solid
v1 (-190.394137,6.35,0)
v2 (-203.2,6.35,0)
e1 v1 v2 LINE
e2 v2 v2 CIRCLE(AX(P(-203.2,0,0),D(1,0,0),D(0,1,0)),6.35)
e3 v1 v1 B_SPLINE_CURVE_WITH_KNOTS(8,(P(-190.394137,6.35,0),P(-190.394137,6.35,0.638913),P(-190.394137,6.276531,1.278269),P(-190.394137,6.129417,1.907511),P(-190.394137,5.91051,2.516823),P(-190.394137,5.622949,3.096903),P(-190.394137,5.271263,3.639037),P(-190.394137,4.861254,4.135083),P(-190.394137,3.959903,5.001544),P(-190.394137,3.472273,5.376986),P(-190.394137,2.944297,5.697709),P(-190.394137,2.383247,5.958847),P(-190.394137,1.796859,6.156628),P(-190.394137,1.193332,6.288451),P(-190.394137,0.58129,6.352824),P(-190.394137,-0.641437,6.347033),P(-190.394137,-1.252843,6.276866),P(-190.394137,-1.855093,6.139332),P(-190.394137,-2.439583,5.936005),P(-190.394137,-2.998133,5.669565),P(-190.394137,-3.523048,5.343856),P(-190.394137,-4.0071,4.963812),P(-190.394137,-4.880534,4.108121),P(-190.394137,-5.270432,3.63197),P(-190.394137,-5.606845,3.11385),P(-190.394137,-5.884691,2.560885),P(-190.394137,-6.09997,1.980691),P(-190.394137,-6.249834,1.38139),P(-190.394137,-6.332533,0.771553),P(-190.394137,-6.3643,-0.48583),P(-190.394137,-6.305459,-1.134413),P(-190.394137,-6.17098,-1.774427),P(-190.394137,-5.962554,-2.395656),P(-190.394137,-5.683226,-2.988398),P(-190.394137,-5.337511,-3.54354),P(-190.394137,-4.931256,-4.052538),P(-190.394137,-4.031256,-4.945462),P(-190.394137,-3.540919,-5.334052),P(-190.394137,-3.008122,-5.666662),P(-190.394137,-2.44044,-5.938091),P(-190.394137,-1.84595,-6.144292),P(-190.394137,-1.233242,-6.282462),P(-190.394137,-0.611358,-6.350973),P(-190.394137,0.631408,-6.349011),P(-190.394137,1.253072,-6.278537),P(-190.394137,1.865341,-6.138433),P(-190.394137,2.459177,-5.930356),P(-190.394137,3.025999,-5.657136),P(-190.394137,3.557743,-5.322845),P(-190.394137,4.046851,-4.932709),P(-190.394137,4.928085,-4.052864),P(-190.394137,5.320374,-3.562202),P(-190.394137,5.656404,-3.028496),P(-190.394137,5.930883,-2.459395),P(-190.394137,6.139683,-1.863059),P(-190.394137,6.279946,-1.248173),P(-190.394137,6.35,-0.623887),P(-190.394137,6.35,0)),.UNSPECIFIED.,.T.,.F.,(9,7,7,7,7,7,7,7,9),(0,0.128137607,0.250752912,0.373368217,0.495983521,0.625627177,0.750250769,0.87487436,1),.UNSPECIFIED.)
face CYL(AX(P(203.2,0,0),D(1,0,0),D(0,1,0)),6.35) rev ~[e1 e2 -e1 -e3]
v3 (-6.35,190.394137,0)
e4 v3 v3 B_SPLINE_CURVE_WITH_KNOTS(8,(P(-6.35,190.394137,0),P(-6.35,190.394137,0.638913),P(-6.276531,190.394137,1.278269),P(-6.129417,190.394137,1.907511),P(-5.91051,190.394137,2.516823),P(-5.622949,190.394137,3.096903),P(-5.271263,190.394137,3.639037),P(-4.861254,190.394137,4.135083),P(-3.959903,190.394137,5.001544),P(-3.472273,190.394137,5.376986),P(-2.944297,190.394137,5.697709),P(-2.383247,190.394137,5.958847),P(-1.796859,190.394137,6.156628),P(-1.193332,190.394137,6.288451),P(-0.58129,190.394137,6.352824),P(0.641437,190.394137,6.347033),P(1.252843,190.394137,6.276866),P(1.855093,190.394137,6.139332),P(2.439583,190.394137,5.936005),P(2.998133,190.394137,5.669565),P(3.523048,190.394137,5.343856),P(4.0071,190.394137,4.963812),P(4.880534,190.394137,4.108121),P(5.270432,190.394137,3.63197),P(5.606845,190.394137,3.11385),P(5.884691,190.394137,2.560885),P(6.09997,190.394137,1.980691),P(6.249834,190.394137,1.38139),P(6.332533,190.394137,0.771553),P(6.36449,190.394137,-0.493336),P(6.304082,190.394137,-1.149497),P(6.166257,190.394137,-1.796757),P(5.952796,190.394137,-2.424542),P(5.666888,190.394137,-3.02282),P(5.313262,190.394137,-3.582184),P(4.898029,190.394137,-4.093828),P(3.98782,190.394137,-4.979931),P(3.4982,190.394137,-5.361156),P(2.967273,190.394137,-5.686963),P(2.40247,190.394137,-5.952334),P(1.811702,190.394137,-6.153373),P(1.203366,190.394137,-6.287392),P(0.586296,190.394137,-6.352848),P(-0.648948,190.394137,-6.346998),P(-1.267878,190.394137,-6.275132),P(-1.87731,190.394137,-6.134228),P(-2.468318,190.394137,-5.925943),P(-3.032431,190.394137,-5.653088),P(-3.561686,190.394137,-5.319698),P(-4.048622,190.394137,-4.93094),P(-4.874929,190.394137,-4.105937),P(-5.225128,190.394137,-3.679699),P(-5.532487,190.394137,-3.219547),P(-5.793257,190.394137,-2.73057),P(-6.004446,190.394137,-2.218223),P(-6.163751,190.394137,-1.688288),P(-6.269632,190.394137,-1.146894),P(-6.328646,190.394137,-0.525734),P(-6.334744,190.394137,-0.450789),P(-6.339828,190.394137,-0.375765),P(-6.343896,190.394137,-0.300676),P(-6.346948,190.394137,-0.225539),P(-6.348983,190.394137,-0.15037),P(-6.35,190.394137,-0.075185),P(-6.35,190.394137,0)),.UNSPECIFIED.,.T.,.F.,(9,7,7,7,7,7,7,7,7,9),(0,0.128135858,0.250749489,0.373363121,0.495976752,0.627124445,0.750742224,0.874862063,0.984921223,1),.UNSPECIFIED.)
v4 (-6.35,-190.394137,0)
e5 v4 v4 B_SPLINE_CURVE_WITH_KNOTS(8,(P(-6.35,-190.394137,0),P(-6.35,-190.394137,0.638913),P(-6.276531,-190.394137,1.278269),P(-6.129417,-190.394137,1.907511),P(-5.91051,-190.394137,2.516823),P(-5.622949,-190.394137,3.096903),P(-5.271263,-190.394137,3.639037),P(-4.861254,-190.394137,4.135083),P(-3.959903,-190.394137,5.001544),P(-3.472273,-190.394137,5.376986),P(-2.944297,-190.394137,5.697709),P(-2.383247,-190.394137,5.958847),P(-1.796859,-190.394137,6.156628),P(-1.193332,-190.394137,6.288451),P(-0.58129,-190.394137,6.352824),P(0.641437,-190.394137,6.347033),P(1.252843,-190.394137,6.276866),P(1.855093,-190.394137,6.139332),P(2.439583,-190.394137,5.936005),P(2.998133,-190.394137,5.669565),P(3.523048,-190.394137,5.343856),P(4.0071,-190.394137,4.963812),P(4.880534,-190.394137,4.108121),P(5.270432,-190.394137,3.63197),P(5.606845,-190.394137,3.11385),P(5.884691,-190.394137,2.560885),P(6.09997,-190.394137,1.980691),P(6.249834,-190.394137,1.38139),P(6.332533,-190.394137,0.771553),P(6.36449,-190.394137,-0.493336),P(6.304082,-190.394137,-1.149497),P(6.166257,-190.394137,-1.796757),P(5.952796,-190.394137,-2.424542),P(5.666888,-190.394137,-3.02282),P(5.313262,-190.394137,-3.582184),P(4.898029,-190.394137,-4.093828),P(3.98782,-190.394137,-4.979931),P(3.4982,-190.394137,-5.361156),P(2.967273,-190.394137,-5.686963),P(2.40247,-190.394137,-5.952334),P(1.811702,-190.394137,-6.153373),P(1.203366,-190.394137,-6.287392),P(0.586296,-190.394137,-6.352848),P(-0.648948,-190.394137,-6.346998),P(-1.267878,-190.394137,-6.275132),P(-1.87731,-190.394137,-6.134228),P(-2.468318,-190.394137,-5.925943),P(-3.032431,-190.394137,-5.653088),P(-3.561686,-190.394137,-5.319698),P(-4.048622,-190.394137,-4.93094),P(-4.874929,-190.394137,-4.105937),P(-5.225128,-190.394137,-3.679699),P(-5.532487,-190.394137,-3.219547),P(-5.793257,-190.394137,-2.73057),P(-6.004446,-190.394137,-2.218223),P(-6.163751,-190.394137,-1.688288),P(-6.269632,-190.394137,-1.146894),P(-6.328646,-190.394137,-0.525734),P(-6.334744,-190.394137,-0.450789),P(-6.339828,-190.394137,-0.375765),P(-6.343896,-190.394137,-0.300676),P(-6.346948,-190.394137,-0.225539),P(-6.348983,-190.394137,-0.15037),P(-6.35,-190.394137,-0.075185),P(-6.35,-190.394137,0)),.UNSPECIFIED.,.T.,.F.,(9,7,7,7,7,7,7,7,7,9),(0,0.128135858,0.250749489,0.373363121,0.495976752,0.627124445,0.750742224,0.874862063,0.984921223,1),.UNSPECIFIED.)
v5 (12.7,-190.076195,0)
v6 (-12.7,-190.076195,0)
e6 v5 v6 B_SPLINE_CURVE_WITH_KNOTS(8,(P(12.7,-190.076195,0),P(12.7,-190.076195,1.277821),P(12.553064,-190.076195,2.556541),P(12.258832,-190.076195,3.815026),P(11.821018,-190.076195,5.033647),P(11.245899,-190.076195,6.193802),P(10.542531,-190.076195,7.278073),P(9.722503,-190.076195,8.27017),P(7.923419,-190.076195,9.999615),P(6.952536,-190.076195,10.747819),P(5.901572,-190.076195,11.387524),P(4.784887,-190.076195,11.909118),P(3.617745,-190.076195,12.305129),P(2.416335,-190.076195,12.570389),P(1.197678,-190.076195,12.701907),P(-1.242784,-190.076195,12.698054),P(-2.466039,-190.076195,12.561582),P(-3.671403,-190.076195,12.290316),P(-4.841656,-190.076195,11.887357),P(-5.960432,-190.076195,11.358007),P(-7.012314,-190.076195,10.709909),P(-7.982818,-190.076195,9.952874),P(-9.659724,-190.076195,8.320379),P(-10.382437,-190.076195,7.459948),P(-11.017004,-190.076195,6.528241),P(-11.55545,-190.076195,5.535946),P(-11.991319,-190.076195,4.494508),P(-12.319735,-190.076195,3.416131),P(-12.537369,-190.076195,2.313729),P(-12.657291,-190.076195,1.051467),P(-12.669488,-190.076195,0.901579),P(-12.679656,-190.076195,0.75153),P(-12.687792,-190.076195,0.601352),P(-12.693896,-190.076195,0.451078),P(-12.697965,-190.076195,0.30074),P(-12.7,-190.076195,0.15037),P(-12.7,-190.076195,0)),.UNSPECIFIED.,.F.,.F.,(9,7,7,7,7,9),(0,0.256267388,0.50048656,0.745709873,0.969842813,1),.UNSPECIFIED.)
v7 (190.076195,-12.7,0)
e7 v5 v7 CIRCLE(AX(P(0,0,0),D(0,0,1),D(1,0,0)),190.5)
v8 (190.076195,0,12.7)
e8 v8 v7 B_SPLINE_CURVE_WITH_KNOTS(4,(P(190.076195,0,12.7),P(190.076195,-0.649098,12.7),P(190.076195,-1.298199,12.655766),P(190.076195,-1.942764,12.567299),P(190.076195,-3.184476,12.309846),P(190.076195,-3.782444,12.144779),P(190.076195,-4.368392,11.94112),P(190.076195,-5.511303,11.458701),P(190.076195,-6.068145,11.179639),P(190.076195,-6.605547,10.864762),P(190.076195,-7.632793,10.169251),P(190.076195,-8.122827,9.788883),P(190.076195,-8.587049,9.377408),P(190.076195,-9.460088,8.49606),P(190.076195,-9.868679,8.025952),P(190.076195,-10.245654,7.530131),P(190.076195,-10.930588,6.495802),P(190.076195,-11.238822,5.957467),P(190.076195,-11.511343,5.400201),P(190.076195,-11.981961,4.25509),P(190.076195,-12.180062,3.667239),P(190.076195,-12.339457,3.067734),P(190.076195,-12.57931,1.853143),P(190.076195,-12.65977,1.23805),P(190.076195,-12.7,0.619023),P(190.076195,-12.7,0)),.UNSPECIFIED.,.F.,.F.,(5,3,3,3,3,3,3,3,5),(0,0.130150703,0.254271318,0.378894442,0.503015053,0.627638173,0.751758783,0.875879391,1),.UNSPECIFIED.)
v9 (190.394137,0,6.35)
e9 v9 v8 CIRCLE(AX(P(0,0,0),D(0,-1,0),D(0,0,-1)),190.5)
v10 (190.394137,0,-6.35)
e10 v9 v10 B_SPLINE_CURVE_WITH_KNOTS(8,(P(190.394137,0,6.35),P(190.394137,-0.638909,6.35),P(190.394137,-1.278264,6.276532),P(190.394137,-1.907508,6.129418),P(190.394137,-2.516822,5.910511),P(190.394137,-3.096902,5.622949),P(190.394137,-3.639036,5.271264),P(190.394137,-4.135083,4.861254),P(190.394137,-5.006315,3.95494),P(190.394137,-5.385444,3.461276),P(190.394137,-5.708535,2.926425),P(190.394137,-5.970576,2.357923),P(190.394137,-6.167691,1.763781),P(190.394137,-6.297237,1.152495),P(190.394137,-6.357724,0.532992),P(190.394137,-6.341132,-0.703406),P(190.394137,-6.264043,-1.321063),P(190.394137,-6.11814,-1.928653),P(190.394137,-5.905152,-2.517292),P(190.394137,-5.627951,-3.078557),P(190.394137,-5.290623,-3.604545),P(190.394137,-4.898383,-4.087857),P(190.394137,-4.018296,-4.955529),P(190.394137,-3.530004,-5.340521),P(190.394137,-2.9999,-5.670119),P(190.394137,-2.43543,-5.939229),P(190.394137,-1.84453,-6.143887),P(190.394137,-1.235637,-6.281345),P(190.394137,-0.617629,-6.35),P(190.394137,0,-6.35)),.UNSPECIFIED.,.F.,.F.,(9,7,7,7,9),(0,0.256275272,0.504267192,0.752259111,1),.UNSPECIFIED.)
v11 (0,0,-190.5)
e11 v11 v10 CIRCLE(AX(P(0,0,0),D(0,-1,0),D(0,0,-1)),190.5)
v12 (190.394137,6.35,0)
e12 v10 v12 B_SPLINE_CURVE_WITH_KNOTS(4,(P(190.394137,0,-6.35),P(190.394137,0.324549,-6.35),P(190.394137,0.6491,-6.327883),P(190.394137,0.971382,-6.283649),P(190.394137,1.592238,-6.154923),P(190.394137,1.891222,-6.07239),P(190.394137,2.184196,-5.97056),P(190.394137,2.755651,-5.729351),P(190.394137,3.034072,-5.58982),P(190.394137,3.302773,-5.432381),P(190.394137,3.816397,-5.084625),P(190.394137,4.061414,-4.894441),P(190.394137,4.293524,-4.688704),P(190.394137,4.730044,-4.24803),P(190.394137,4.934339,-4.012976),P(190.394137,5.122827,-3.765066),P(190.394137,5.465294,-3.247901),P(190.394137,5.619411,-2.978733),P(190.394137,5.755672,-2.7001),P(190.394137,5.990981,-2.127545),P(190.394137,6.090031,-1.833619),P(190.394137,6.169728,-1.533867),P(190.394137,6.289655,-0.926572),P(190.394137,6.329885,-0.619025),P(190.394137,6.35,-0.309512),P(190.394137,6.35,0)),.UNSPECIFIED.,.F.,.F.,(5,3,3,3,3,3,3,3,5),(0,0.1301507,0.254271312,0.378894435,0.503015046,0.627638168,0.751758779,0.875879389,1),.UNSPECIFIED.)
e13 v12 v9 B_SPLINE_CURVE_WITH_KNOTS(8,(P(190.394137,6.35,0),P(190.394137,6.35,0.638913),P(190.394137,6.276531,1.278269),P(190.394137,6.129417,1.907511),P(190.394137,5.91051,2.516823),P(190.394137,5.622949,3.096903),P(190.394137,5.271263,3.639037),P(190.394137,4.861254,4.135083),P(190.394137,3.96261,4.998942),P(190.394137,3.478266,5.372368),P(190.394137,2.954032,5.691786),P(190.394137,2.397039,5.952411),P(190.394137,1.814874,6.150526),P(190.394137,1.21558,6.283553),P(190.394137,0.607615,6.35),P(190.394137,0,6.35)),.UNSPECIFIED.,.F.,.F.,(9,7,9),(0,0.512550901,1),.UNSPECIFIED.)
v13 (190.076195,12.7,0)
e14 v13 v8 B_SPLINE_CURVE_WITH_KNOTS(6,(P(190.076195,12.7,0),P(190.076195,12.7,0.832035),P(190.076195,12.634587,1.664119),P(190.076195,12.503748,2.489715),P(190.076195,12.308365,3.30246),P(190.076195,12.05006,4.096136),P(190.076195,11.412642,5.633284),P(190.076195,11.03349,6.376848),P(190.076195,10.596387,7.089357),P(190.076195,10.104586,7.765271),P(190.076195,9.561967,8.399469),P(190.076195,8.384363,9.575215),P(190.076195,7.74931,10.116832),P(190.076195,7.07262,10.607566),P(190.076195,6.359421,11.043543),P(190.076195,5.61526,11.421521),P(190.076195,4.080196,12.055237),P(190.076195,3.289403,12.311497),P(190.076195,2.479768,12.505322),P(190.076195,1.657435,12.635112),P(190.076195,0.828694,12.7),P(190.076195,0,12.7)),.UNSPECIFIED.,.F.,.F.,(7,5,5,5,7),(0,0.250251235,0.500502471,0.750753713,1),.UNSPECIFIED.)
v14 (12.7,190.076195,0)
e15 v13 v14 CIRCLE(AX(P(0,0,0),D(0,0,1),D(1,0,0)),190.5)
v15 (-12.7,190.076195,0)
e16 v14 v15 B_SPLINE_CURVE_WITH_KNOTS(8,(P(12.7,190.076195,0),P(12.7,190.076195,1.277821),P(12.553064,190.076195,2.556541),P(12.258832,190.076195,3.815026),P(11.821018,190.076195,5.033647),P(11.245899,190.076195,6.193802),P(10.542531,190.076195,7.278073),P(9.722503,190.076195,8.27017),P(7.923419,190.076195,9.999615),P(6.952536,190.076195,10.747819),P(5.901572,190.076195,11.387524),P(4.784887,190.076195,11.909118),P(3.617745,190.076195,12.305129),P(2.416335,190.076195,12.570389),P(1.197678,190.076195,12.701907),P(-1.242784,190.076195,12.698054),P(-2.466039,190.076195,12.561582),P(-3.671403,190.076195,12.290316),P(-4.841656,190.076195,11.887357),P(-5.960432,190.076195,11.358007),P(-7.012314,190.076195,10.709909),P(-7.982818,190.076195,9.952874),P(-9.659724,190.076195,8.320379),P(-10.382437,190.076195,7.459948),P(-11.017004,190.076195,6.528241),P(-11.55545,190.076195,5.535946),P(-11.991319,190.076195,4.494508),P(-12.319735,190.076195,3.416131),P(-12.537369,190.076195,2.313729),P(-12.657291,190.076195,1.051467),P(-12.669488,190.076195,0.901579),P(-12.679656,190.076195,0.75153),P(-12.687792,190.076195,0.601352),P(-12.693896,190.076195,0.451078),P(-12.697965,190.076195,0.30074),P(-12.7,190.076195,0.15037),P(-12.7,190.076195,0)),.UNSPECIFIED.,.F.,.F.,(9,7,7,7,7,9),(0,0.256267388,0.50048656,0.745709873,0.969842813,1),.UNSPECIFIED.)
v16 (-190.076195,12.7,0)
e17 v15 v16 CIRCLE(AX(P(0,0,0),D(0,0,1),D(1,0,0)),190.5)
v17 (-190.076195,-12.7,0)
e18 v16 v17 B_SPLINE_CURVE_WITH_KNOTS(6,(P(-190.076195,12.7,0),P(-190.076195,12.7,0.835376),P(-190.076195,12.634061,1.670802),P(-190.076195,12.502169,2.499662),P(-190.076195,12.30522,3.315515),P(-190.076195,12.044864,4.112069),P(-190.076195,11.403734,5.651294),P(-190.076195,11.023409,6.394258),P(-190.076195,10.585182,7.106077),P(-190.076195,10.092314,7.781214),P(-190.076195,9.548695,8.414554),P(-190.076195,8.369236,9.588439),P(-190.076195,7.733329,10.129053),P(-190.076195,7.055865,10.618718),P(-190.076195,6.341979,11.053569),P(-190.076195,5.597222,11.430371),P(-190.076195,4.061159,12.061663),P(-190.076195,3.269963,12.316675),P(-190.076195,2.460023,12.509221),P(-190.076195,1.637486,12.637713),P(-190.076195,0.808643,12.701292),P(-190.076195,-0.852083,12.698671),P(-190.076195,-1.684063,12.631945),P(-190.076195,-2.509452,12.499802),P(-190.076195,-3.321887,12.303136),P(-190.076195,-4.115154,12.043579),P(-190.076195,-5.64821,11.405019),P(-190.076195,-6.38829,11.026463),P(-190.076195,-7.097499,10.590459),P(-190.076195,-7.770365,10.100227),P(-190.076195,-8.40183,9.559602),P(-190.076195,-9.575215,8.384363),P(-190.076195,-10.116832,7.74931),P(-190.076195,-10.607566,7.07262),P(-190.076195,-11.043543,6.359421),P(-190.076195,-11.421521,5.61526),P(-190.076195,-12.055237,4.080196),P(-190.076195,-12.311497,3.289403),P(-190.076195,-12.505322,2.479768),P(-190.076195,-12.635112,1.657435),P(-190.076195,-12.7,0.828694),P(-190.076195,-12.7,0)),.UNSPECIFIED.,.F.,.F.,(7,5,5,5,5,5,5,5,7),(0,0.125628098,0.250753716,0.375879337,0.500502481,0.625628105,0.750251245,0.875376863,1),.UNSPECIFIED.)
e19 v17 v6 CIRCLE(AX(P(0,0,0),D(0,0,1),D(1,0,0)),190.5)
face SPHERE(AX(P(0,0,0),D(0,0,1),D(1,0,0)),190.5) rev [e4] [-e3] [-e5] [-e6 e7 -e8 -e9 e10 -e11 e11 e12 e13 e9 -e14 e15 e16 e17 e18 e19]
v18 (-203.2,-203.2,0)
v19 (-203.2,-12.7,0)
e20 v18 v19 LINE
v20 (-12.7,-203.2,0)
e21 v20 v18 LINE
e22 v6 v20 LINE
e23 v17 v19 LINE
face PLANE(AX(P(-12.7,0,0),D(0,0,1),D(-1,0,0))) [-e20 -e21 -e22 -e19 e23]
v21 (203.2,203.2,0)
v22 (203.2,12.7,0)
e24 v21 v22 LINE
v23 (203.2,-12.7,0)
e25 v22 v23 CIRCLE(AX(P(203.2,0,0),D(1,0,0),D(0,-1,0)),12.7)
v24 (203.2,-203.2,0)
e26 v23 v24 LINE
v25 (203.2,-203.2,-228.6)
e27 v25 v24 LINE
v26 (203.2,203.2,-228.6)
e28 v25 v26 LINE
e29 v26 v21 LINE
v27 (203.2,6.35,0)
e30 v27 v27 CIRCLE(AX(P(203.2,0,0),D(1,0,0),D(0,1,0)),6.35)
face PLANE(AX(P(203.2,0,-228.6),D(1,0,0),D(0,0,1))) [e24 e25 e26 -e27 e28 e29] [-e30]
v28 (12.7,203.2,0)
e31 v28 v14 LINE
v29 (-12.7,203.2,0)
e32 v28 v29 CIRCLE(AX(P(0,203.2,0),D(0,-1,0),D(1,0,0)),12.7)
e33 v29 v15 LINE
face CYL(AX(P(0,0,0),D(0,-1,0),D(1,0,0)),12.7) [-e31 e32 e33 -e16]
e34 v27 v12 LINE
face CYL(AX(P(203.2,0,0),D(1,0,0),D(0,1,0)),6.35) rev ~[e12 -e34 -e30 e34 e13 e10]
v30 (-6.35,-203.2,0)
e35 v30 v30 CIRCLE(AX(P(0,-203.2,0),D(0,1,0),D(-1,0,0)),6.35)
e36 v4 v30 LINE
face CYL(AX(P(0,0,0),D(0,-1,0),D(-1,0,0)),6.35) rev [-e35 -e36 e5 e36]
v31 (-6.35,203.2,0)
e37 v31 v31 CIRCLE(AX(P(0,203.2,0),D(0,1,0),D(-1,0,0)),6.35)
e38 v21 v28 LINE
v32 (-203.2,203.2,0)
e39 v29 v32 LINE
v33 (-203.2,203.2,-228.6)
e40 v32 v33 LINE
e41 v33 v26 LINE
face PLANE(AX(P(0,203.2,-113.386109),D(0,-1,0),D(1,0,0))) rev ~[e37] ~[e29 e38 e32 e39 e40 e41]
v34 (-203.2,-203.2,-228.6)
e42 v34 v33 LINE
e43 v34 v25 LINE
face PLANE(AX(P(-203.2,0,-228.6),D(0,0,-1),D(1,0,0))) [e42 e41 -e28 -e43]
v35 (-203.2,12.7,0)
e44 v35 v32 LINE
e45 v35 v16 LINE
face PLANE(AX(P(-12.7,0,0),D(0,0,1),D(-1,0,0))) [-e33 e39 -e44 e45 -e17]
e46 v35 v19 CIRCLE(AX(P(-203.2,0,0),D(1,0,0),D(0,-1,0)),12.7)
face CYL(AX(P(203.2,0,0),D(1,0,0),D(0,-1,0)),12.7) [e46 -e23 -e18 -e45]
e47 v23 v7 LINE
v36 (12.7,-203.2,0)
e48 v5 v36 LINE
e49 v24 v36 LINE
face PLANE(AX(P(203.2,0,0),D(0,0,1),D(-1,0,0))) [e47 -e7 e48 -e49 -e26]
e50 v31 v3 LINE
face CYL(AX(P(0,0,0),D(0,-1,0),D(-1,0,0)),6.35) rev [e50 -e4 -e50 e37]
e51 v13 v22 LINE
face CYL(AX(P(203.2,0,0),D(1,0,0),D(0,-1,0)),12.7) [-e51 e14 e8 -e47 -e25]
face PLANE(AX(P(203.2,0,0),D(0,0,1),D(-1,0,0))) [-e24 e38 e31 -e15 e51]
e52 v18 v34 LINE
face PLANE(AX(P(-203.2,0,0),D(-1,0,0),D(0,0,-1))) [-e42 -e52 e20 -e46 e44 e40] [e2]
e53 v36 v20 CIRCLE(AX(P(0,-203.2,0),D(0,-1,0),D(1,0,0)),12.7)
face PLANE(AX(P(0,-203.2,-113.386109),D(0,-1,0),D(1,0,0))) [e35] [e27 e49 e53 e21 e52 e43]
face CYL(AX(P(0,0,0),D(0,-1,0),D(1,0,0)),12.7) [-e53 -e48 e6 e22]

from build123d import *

# Parameters (mm, degrees)
F1_DEPTH      = 203.2
F1_DEPTH_BACK = 203.2
F4_DEPTH      = 406.4
F5_R          = 6.35
F6_DEPTH      = 406.4


# Not quite as in the source:
# - a feature names something its author has since deleted; it is built from what else it names


with BuildPart() as f1:
    # F0 (on Front) → F1 (new body, two sides)
    with BuildSketch(Plane.XZ) as f1_sk:
        with BuildLine():
            Line((203.2, 0), (12.7, 0))
            ThreePointArc((12.7, 0), (0, -12.7), (-12.7, 0))
            Line((-12.7, 0), (-203.2, 0))
            Line((-203.2, 0), (-203.2, -228.6))
            Line((-203.2, -228.6), (203.2, -228.6))
            Line((203.2, -228.6), (203.2, 0))
        make_face()
        with BuildLine():
            Line((12.7, 0), (6.35, 0))
            ThreePointArc((6.35, 0), (0, -6.35), (-6.35, 0))
            Line((-6.35, 0), (-12.7, 0))
            ThreePointArc((-12.7, 0), (0, -12.7), (12.7, 0))
        make_face()
        with BuildLine():
            ThreePointArc((-6.35, 0), (0, 6.35), (6.35, 0))
            Line((6.35, 0), (12.7, 0))
            ThreePointArc((12.7, 0), (0, 12.7), (-12.7, 0))
            Line((-12.7, 0), (-6.35, 0))
        make_face()
    extrude(amount=F1_DEPTH)
    extrude(f1_sk.sketch, amount=-F1_DEPTH_BACK)

    # F3 (on face) → F4 (join)
    with BuildSketch(Plane.YZ.offset(203.2)):
        with BuildLine():
            Line((-12.7, 0), (12.7, 0))
            ThreePointArc((12.7, 0), (0, 12.7), (-12.7, 0))
        make_face()
        with BuildLine():
            ThreePointArc((-12.7, 0), (0, -12.7), (12.7, 0))
            Line((12.7, 0), (-12.7, 0))
        make_face()
    extrude(amount=-F4_DEPTH)

    # F5 (on face) → F6 (cut)
    with BuildSketch(Plane.YZ.offset(203.2)):
        Circle(F5_R)
    extrude(amount=-F6_DEPTH, mode=Mode.SUBTRACT)

    # F2 (on Front) → F7 (revolve, cut)
    with BuildSketch(Plane.XZ):
        with BuildLine():
            Line((0, 190.5), (0, -190.5))
            ThreePointArc((0, -190.5), (190.5, 0), (0, 190.5))
        make_face()
    revolve(axis=Axis((0, 0, 0), (0, 0, -1)), mode=Mode.SUBTRACT)


solid = f1.part
